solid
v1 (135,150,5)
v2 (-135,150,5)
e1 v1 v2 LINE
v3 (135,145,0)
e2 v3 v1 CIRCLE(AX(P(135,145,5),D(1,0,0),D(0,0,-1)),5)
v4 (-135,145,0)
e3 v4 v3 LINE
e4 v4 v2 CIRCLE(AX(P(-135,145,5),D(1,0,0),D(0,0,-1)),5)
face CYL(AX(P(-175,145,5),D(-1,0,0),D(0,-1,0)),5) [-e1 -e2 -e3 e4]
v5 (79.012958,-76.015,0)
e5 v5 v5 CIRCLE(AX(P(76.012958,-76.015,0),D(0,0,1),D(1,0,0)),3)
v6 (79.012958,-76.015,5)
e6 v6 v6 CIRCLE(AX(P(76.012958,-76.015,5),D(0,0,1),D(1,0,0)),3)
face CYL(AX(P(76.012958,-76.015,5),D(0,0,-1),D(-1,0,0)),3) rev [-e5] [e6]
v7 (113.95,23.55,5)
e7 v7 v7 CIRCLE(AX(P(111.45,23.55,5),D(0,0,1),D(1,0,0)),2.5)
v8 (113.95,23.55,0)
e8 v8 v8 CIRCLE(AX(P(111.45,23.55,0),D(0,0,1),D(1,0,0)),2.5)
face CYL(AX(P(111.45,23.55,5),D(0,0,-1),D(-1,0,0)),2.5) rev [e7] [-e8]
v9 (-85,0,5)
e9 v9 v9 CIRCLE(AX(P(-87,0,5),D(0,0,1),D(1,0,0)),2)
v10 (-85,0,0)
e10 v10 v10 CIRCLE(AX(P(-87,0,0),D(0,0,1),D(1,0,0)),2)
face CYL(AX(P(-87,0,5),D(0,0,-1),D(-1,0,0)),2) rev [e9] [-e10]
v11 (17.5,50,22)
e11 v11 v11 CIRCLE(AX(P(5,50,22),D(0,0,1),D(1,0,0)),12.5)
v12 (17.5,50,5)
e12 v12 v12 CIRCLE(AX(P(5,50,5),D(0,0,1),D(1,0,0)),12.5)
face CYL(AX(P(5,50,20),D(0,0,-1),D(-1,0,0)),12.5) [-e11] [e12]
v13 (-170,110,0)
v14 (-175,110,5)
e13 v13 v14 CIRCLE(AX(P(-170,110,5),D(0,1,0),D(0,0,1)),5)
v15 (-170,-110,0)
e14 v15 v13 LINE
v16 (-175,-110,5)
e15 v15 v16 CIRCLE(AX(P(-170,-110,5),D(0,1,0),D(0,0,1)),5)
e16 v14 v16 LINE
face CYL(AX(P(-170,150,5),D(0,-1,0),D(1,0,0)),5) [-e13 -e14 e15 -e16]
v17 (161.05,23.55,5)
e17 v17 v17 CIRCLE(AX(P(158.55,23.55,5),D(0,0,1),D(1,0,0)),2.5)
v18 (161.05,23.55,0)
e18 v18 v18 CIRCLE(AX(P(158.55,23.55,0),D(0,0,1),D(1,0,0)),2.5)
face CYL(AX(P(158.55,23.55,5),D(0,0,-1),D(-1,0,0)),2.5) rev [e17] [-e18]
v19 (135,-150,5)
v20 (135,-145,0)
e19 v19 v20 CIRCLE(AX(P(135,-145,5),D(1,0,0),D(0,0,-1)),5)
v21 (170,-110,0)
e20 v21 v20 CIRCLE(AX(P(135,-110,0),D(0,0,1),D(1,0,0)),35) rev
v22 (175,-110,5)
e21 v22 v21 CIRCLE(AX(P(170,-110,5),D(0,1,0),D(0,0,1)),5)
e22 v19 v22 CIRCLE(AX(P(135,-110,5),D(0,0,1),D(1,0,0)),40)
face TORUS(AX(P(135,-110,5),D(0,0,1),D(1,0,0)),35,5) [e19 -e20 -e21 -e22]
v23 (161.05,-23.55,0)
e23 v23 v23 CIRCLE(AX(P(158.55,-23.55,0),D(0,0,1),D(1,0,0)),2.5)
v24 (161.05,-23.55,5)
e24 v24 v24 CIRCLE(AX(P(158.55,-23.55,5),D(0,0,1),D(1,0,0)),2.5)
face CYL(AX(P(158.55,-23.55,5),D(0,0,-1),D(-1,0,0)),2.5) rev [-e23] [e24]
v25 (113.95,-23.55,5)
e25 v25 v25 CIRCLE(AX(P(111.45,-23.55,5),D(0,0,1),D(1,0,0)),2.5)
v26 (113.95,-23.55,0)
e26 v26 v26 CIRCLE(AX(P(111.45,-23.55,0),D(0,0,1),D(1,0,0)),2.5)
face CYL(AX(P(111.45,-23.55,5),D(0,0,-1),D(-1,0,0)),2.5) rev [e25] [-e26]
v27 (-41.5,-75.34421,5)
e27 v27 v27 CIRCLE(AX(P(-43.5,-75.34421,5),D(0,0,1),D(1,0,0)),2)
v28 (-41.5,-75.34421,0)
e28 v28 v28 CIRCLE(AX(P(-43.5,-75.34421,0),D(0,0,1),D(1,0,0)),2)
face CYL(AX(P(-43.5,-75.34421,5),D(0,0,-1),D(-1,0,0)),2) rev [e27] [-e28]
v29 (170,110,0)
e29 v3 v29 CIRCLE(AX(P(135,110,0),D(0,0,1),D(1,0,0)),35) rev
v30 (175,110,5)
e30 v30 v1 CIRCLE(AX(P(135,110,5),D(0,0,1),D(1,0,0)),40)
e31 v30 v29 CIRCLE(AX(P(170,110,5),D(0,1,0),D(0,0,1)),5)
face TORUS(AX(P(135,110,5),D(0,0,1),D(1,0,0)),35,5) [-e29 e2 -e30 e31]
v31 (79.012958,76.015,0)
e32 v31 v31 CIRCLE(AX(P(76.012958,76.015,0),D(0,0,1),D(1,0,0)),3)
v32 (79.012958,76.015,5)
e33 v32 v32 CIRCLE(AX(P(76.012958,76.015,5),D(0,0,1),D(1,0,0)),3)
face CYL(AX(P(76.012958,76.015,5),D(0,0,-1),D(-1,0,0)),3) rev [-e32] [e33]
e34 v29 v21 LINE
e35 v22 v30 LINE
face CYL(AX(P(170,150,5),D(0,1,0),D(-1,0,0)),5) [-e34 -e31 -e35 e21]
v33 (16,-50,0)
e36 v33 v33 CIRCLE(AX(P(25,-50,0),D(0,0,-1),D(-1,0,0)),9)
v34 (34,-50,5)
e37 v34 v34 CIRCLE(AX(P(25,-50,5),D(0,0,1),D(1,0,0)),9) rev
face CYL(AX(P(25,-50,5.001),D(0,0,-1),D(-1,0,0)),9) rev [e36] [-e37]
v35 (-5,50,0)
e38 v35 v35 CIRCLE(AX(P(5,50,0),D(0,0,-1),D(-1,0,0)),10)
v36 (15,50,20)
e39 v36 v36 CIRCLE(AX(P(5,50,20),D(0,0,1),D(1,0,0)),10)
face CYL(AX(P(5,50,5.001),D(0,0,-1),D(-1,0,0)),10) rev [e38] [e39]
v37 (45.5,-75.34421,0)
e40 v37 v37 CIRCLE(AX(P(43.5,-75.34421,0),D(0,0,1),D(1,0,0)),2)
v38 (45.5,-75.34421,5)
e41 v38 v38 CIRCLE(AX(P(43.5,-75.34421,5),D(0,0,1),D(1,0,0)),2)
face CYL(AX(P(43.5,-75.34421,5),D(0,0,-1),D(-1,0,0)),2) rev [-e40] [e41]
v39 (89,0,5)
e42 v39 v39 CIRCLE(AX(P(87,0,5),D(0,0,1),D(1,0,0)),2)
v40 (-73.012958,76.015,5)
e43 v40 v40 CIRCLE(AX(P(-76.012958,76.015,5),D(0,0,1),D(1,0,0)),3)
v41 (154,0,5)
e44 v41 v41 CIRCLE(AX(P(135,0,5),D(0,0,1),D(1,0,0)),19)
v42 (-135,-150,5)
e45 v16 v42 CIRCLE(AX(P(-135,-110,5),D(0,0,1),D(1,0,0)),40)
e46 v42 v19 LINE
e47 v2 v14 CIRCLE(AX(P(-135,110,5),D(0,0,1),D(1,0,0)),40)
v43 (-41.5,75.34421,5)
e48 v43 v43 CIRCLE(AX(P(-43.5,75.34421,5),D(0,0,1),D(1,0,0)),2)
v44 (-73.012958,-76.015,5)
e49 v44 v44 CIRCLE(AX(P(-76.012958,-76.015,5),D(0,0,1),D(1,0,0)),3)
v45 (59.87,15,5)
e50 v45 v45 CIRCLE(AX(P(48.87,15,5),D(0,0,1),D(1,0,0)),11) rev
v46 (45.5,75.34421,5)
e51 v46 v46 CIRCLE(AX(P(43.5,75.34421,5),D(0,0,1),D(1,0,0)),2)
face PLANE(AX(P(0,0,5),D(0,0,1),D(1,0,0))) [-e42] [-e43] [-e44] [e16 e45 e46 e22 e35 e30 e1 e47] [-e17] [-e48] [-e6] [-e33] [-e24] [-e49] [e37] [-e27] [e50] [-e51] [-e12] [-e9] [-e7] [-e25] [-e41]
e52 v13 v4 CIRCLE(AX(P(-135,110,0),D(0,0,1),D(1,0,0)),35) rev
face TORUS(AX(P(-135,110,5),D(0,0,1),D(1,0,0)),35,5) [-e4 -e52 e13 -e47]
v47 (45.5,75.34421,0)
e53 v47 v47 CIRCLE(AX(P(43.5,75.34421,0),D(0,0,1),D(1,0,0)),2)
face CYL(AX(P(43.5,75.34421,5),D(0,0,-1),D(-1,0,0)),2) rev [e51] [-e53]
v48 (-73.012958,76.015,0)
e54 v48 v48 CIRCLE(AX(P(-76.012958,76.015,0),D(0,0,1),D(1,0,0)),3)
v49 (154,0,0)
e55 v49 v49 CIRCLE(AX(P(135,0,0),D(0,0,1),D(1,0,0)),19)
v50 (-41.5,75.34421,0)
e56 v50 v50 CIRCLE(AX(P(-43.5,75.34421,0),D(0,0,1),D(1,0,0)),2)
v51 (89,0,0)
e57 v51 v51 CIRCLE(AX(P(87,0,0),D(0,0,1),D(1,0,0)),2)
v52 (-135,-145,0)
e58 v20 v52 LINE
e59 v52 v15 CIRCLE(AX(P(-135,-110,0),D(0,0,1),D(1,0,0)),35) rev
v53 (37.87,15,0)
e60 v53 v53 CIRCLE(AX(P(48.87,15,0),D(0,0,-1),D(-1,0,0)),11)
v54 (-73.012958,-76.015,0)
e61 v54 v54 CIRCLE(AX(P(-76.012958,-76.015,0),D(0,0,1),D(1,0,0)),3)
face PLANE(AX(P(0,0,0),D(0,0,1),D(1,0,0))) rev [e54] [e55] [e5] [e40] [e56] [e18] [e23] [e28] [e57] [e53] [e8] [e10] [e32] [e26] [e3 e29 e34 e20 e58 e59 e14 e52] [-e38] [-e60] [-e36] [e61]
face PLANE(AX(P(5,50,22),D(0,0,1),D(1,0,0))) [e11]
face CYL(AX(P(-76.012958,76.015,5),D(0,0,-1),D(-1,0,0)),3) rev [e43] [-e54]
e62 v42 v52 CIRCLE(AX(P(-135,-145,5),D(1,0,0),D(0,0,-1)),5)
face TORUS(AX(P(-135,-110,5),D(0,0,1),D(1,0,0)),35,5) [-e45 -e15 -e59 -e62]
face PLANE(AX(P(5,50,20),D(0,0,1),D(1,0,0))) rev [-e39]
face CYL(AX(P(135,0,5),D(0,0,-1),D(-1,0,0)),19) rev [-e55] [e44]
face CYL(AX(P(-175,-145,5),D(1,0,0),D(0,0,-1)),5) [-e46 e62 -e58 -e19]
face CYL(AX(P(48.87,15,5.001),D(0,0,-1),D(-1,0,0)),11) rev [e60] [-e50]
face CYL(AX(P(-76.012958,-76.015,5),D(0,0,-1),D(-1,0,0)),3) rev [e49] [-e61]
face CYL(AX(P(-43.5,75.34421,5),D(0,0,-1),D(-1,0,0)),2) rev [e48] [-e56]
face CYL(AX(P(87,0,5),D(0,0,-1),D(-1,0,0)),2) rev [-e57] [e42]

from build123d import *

# Parameters (mm, degrees)
SKETCH1_W           = 350
SKETCH1_H           = 300
SKETCH1_R           = 2
SKETCH1_R_2         = 3
SKETCH1_R_3         = 19
SKETCH1_R_4         = 2.5
BOSS_EXTRUDE1_DEPTH = 5
CUT_EXTRUDE1_REACH  = 232.543
SKETCH2_R           = 11
SKETCH2_R_2         = 9
SKETCH2_R_3         = 10
FILLET1_R           = 40
FILLET2_R           = 5
SKETCH3_R           = 12.5
SKETCH3_R_2         = 10
BOSS_EXTRUDE2_DEPTH = 15
SKETCH4_R           = 12.5
BOSS_EXTRUDE3_DEPTH = 2


with BuildPart() as part:
    # Sketch1 → Boss-Extrude1 (new body)
    with BuildSketch(Plane.XY):
        Rectangle(SKETCH1_W, SKETCH1_H)
        with Locations((-43.5, 75.344210129)):
            Circle(SKETCH1_R, mode=Mode.SUBTRACT)
        with Locations((43.5, 75.344210129)):
            Circle(SKETCH1_R, mode=Mode.SUBTRACT)
        with Locations((87, 0)):
            Circle(SKETCH1_R, mode=Mode.SUBTRACT)
        with Locations((43.5, -75.344210129)):
            Circle(SKETCH1_R, mode=Mode.SUBTRACT)
        with Locations((-43.5, -75.344210129)):
            Circle(SKETCH1_R, mode=Mode.SUBTRACT)
        with Locations((-87, 0)):
            Circle(SKETCH1_R, mode=Mode.SUBTRACT)
        with Locations((-76.012957941, -76.015)):
            Circle(SKETCH1_R_2, mode=Mode.SUBTRACT)
        with Locations((76.012957941, 76.015)):
            Circle(SKETCH1_R_2, mode=Mode.SUBTRACT)
        with Locations((76.012957941, -76.015)):
            Circle(SKETCH1_R_2, mode=Mode.SUBTRACT)
        with Locations((-76.012957941, 76.015)):
            Circle(SKETCH1_R_2, mode=Mode.SUBTRACT)
        with Locations((135, 0)):
            Circle(SKETCH1_R_3, mode=Mode.SUBTRACT)
        with Locations((158.55, -23.55)):
            Circle(SKETCH1_R_4, mode=Mode.SUBTRACT)
        with Locations((111.45, -23.55)):
            Circle(SKETCH1_R_4, mode=Mode.SUBTRACT)
        with Locations((111.45, 23.55)):
            Circle(SKETCH1_R_4, mode=Mode.SUBTRACT)
        with Locations((158.55, 23.55)):
            Circle(SKETCH1_R_4, mode=Mode.SUBTRACT)
    extrude(amount=BOSS_EXTRUDE1_DEPTH)

    # Sketch2 → Cut-Extrude1 (cut, up to next)
    with BuildSketch(Plane(origin=(0, 0, 0), x_dir=(-1, 0, 0), z_dir=(0, 0, -1)), mode=Mode.PRIVATE) as cut_extrude1_sk1:
        with Locations((-48.87, 15)):
            Circle(SKETCH2_R)
    cut_extrude1_tool1 = extrude(cut_extrude1_sk1.sketch, amount=-CUT_EXTRUDE1_REACH, mode=Mode.PRIVATE) & part.part
    # Sketch2 → Cut-Extrude1 (cut, up to next)
    with BuildSketch(Plane(origin=(0, 0, 0), x_dir=(-1, 0, 0), z_dir=(0, 0, -1)), mode=Mode.PRIVATE) as cut_extrude1_sk2:
        with Locations((-25, -50)):
            Circle(SKETCH2_R_2)
    cut_extrude1_tool2 = extrude(cut_extrude1_sk2.sketch, amount=-CUT_EXTRUDE1_REACH, mode=Mode.PRIVATE) & part.part
    # Sketch2 → Cut-Extrude1 (cut, up to next)
    with BuildSketch(Plane(origin=(0, 0, 0), x_dir=(-1, 0, 0), z_dir=(0, 0, -1)), mode=Mode.PRIVATE) as cut_extrude1_sk3:
        with Locations((-5, 50)):
            Circle(SKETCH2_R_3)
    cut_extrude1_tool3 = extrude(cut_extrude1_sk3.sketch, amount=-CUT_EXTRUDE1_REACH, mode=Mode.PRIVATE) & part.part
    add(cut_extrude1_tool1.solids().sort_by_distance((48.87, 15, 0))[0], mode=Mode.SUBTRACT)
    add(cut_extrude1_tool2.solids().sort_by_distance((25, -50, 0))[0], mode=Mode.SUBTRACT)
    add(cut_extrude1_tool3.solids().sort_by_distance((5, 50, 0))[0], mode=Mode.SUBTRACT)

    # Fillet1
    fillet1_edges = [part.edges().sort_by_distance(p)[0] for p in [
        (175, -150, 2.5),
        (-175, -150, 2.5),
        (-175, 150, 2.5),
        (175, 150, 2.5),
    ]]
    fillet(fillet1_edges, radius=FILLET1_R)

    # Fillet2
    fillet2_edges = [part.edges().sort_by_distance(p)[0] for p in [
        (163.284271247, 138.284271247, 0),
        (175, 0, 0),
        (163.284271247, -138.284271247, 0),
        (0, -150, 0),
        (-163.284271247, -138.284271247, 0),
        (-175, 0, 0),
        (-163.284271247, 138.284271247, 0),
        (0, 150, 0),
    ]]
    fillet(fillet2_edges, radius=FILLET2_R - 0.0001)  # a hair under: the kernel refuses the full size

    # Sketch3 → Boss-Extrude2 (add)
    with BuildSketch(Plane.XY.offset(5)):
        with Locations((5, 50)):
            Circle(SKETCH3_R)
        with Locations(Location((5, 50, 0), (0, 0, 180))):
            Circle(SKETCH3_R_2, mode=Mode.SUBTRACT)
    extrude(amount=BOSS_EXTRUDE2_DEPTH)

    # Sketch4 → Boss-Extrude3 (add)
    with BuildSketch(Plane.XY.offset(20)):
        with Locations((5, 50)):
            Circle(SKETCH4_R)
    extrude(amount=BOSS_EXTRUDE3_DEPTH)


solid = part.part
